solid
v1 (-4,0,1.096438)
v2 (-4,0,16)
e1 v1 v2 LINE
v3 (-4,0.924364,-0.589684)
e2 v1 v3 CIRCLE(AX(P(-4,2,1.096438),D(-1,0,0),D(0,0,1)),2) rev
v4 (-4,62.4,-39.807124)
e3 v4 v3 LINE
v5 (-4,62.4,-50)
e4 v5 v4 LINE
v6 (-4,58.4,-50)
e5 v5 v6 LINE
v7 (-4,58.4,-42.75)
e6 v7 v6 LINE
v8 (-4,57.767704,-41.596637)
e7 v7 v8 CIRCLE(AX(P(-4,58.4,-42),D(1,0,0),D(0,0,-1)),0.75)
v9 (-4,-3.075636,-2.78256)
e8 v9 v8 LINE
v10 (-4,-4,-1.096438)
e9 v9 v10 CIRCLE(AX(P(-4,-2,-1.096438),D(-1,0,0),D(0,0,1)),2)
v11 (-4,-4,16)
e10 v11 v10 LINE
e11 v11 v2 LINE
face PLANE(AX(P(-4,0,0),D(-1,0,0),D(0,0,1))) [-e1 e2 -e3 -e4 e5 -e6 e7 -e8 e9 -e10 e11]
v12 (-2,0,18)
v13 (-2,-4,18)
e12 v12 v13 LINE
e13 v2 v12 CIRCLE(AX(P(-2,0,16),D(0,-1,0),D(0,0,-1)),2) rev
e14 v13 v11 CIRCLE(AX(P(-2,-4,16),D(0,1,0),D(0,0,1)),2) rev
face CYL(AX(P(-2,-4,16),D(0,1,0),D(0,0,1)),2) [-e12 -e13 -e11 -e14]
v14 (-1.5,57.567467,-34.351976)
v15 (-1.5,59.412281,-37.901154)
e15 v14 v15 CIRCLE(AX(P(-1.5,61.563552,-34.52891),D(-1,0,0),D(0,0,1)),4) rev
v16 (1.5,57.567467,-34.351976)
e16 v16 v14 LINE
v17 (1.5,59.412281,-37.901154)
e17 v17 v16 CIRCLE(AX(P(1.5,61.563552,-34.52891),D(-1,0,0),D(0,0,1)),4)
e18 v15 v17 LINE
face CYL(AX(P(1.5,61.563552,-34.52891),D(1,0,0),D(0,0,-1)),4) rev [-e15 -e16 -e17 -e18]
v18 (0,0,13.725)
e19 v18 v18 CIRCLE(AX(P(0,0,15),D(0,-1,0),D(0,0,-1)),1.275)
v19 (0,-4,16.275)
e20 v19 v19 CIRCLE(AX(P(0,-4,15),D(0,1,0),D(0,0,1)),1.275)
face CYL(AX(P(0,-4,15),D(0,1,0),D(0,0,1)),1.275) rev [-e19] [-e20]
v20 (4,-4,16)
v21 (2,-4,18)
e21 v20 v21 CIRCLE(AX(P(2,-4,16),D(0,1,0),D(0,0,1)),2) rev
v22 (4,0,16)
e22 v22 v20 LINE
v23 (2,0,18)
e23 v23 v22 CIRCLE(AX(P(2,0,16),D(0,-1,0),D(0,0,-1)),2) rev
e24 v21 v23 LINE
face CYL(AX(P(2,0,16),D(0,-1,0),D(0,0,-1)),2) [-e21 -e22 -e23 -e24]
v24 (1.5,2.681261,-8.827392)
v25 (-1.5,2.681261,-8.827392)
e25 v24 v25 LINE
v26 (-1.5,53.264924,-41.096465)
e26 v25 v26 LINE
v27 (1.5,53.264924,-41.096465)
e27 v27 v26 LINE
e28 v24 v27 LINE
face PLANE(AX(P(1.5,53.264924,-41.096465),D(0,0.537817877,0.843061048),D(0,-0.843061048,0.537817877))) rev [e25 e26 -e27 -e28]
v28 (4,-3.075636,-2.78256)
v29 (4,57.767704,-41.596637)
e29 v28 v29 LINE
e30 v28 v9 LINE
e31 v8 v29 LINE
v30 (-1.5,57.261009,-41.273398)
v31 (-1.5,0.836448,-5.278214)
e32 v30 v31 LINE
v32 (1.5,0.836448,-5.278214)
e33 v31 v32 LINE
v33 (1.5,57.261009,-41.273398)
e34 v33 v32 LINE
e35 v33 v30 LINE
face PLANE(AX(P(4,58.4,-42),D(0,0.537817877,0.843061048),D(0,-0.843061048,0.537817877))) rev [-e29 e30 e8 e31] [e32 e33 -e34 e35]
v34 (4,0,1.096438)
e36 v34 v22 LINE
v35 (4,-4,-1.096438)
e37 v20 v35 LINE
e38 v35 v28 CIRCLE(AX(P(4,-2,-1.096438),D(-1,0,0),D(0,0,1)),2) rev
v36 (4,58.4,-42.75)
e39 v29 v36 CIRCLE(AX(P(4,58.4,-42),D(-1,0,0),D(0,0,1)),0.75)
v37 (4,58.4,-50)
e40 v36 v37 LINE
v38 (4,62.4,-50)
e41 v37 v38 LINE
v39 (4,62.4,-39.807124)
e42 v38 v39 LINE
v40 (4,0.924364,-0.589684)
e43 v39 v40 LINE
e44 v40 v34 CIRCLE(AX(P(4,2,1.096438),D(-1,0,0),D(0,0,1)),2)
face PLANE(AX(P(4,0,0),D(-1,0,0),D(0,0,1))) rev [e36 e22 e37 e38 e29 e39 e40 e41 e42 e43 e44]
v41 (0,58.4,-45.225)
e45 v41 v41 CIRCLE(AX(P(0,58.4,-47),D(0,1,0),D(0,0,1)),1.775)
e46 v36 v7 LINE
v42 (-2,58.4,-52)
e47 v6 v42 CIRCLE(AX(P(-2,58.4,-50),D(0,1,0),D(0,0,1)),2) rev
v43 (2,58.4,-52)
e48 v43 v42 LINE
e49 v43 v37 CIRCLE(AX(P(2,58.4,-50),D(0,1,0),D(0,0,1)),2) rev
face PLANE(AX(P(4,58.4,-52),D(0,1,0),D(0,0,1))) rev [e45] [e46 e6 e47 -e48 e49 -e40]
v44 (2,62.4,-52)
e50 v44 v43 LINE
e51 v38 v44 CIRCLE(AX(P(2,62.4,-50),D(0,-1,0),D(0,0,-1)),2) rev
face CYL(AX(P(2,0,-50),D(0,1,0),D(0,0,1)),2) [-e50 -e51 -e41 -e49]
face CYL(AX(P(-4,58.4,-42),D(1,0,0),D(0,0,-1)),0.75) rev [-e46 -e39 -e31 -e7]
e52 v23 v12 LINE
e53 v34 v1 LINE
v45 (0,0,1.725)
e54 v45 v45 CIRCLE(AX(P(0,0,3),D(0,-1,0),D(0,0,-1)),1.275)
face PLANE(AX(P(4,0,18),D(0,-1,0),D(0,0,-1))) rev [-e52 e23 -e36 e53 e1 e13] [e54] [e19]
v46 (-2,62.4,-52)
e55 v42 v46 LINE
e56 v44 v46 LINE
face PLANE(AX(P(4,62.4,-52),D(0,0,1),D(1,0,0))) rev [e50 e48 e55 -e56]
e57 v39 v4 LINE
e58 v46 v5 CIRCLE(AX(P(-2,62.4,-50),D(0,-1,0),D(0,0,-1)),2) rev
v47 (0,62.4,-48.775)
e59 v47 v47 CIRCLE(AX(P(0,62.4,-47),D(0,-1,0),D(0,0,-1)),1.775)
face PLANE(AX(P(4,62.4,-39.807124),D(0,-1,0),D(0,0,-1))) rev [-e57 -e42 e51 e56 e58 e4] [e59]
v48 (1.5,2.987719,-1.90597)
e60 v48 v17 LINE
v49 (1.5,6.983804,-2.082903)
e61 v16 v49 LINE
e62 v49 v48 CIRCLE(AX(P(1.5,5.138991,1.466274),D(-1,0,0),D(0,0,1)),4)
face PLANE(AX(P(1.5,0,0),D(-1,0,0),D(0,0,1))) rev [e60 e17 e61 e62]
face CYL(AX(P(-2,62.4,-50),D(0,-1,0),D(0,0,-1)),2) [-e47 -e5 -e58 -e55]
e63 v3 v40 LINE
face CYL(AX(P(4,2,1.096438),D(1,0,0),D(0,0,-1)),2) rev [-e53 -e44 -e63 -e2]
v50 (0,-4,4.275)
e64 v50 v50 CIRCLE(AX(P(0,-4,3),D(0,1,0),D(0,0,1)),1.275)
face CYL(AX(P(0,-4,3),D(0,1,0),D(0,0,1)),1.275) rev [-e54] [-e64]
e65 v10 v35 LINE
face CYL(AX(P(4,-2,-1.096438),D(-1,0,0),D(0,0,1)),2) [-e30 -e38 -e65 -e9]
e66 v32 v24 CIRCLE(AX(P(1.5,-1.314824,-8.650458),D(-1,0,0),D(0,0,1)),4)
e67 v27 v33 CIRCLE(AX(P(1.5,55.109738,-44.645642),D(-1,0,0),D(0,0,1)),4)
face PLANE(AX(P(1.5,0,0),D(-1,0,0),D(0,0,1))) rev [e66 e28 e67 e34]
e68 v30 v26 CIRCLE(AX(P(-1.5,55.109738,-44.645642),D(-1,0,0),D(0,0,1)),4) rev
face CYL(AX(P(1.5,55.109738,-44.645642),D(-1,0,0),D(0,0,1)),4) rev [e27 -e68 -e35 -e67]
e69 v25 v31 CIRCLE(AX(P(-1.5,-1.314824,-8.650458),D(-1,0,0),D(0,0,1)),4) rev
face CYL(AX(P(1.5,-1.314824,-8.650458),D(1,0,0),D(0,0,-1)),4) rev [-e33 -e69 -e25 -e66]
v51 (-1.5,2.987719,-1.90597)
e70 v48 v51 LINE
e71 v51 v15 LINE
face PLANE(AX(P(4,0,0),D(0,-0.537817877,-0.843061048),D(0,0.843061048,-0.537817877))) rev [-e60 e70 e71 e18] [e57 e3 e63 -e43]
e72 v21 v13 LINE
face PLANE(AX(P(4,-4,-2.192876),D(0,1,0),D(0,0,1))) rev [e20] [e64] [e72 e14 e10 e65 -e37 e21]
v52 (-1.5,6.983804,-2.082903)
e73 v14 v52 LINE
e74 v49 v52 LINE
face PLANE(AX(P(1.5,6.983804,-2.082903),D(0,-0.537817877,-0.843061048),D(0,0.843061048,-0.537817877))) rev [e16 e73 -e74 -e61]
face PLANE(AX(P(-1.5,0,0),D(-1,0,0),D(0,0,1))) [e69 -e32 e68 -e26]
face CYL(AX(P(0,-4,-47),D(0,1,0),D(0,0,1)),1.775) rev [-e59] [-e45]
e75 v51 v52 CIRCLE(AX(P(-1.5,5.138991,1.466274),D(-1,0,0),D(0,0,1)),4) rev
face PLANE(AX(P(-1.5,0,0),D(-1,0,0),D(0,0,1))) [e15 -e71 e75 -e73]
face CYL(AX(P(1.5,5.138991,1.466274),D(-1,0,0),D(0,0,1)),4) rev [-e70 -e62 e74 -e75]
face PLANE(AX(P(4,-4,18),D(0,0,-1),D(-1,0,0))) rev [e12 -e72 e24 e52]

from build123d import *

# Parameters (mm, degrees)
EXTRUDE_1_DEPTH          = 4
CUT_EXTRUDE_1_DEPTH      = 82.325026898
CUT_EXTRUDE_1_DEPTH_BACK = 82.325026898
SKETCH_2_R               = 1.275
CUT_EXTRUDE_2_DEPTH      = 85.433168838
CUT_EXTRUDE_2_DEPTH_BACK = 85.433168838
SKETCH_3_R               = 1.775
EXTRUDE_2_DEPTH          = 1.5
CUT_EXTRUDE_3_DEPTH      = 82.619605488
CUT_EXTRUDE_3_DEPTH_BACK = 82.619605488
SKETCH_5_R               = 0.75
FILLET_2_R               = 4
FILLET_3_R               = 2
FILLET_4_R               = 2


with BuildPart() as part:
    # 草图1 → 凸台-拉伸1 (new, symmetric)
    with BuildSketch(Plane(origin=(0, 0, 0), x_dir=(0, 0, -1), z_dir=(1, 0, 0))):
        Polygon((-18, 0), (0, 0), (39.807123819, 62.4), (52, 62.4), (52, 58.4), (42, 58.4), (2.192876181, -4), (-18, -4), align=None)
    extrude(amount=EXTRUDE_1_DEPTH, both=True)

    # 草图2 → 切除-拉伸1 (cut, two sides: drawn at the far end of the back side and taken through both)
    with BuildSketch(Plane(origin=(0, 0, 0), x_dir=(1, 0, 0), z_dir=(0, 1, 0)).offset(-CUT_EXTRUDE_1_DEPTH_BACK)):
        with Locations(Location((0, -3, 0), (0, 0, 270))):
            Circle(SKETCH_2_R)
        with Locations(Location((0, -15, 0), (0, 0, 270))):
            Circle(SKETCH_2_R)
    extrude(amount=CUT_EXTRUDE_1_DEPTH + CUT_EXTRUDE_1_DEPTH_BACK, mode=Mode.SUBTRACT)

    # 草图3 → 切除-拉伸2 (cut, two sides: drawn at the far end of the back side and taken through both)
    with BuildSketch(Plane(origin=(0, 62.4, 0), x_dir=(1, 0, 0), z_dir=(0, 1, 0)).offset(-CUT_EXTRUDE_2_DEPTH_BACK)):
        with Locations(Location((0, 47, 0), (0, 0, 270))):
            Circle(SKETCH_3_R)
    extrude(amount=CUT_EXTRUDE_2_DEPTH + CUT_EXTRUDE_2_DEPTH_BACK, mode=Mode.SUBTRACT)

    # 草图4 → 凸台-拉伸2 (add, symmetric)
    with BuildSketch(Plane(origin=(0, 0, 0), x_dir=(0, 0, -1), z_dir=(1, 0, 0))):
        Polygon((3.769025595, 5.908168553), (2.082903499, 6.983804308), (34.351976128, 57.567467201), (36.038098224, 56.491831447), align=None)
        Polygon((39.410342417, 54.340559938), (41.096464513, 53.264924184), (8.827391885, 2.681261291), (7.141269788, 3.756897045), align=None)
    extrude(amount=EXTRUDE_2_DEPTH, both=True)

    # 草图5 → 切除-拉伸3 (cut, two sides: drawn at the far end of the back side and taken through both)
    with BuildSketch(Plane(origin=(4, 0, 0), x_dir=(0, 0, -1), z_dir=(1, 0, 0)).offset(-CUT_EXTRUDE_3_DEPTH_BACK)):
        with Locations((42, 58.4)):
            Circle(SKETCH_5_R)
    extrude(amount=CUT_EXTRUDE_3_DEPTH + CUT_EXTRUDE_3_DEPTH_BACK, mode=Mode.SUBTRACT)

    # 圆角2
    # the kernel refuses this fillet: 4 mm, written as the material it adds along each edge
    with BuildSketch(Plane(origin=(-1.5, 3.756897045, -7.141269788), x_dir=(0, -0.8430610482191677, 0.5378178771439251), z_dir=(1, 0, 0)), Plane(origin=(-1.5, 56.491831447, -36.038098224), x_dir=(0, 0.8430610482191674, -0.5378178771439257), z_dir=(1, 0, 0))) as fillet_2_piece_1:
        with BuildLine():
            CenterArc((3.464101615, 4), FILLET_2_R, 210, 60)
            Line((0, 2), (-0.069282032, 1.96))
            ThreePointArc((-0.069282032, 1.96), (-0.08, 1), (-0.08, 0))
            Line((-0.08, 0), (0, -0.08))
            Line((0, -0.08), (3.464101615, -0.08))
            Line((3.464101615, -0.08), (3.464101615, 0))
        make_face()
    extrude(amount=3)
    with BuildSketch(Plane(origin=(-1.5, 5.908168553, -3.769025595), x_dir=(0, -0.8430610482191704, 0.5378178771439209), z_dir=(1, 0, 0)), Plane(origin=(-1.5, 54.340559938, -39.410342417), x_dir=(0, 0.8430610482191698, -0.5378178771439218), z_dir=(1, 0, 0))) as fillet_2_piece_2:
        with BuildLine():
            CenterArc((3.464101615, -4), FILLET_2_R, 90, 60)
            Line((0, -2), (-0.069282032, -1.96))
            ThreePointArc((-0.069282032, -1.96), (-0.08, -1), (-0.08, 0))
            Line((-0.08, 0), (0, 0.08))
            Line((0, 0.08), (3.464101615, 0.08))
            Line((3.464101615, 0.08), (3.464101615, 0))
        make_face()
    extrude(amount=3)

    # 圆角3
    fillet_3_edges = [part.edges().sort_by_distance(p)[0] for p in [
        (-4, -2, 18),
        (4, 60.4, -52),
        (4, -2, 18),
        (-4, 60.4, -52),
    ]]
    fillet(fillet_3_edges, radius=FILLET_3_R)

    # 圆角4
    fillet_4_edges = [part.edges().sort_by_distance(p)[0] for p in [
        (0, 0, 0),
        (0, -4, -2.192876181),
    ]]
    fillet(fillet_4_edges, radius=FILLET_4_R)


solid = part.part
